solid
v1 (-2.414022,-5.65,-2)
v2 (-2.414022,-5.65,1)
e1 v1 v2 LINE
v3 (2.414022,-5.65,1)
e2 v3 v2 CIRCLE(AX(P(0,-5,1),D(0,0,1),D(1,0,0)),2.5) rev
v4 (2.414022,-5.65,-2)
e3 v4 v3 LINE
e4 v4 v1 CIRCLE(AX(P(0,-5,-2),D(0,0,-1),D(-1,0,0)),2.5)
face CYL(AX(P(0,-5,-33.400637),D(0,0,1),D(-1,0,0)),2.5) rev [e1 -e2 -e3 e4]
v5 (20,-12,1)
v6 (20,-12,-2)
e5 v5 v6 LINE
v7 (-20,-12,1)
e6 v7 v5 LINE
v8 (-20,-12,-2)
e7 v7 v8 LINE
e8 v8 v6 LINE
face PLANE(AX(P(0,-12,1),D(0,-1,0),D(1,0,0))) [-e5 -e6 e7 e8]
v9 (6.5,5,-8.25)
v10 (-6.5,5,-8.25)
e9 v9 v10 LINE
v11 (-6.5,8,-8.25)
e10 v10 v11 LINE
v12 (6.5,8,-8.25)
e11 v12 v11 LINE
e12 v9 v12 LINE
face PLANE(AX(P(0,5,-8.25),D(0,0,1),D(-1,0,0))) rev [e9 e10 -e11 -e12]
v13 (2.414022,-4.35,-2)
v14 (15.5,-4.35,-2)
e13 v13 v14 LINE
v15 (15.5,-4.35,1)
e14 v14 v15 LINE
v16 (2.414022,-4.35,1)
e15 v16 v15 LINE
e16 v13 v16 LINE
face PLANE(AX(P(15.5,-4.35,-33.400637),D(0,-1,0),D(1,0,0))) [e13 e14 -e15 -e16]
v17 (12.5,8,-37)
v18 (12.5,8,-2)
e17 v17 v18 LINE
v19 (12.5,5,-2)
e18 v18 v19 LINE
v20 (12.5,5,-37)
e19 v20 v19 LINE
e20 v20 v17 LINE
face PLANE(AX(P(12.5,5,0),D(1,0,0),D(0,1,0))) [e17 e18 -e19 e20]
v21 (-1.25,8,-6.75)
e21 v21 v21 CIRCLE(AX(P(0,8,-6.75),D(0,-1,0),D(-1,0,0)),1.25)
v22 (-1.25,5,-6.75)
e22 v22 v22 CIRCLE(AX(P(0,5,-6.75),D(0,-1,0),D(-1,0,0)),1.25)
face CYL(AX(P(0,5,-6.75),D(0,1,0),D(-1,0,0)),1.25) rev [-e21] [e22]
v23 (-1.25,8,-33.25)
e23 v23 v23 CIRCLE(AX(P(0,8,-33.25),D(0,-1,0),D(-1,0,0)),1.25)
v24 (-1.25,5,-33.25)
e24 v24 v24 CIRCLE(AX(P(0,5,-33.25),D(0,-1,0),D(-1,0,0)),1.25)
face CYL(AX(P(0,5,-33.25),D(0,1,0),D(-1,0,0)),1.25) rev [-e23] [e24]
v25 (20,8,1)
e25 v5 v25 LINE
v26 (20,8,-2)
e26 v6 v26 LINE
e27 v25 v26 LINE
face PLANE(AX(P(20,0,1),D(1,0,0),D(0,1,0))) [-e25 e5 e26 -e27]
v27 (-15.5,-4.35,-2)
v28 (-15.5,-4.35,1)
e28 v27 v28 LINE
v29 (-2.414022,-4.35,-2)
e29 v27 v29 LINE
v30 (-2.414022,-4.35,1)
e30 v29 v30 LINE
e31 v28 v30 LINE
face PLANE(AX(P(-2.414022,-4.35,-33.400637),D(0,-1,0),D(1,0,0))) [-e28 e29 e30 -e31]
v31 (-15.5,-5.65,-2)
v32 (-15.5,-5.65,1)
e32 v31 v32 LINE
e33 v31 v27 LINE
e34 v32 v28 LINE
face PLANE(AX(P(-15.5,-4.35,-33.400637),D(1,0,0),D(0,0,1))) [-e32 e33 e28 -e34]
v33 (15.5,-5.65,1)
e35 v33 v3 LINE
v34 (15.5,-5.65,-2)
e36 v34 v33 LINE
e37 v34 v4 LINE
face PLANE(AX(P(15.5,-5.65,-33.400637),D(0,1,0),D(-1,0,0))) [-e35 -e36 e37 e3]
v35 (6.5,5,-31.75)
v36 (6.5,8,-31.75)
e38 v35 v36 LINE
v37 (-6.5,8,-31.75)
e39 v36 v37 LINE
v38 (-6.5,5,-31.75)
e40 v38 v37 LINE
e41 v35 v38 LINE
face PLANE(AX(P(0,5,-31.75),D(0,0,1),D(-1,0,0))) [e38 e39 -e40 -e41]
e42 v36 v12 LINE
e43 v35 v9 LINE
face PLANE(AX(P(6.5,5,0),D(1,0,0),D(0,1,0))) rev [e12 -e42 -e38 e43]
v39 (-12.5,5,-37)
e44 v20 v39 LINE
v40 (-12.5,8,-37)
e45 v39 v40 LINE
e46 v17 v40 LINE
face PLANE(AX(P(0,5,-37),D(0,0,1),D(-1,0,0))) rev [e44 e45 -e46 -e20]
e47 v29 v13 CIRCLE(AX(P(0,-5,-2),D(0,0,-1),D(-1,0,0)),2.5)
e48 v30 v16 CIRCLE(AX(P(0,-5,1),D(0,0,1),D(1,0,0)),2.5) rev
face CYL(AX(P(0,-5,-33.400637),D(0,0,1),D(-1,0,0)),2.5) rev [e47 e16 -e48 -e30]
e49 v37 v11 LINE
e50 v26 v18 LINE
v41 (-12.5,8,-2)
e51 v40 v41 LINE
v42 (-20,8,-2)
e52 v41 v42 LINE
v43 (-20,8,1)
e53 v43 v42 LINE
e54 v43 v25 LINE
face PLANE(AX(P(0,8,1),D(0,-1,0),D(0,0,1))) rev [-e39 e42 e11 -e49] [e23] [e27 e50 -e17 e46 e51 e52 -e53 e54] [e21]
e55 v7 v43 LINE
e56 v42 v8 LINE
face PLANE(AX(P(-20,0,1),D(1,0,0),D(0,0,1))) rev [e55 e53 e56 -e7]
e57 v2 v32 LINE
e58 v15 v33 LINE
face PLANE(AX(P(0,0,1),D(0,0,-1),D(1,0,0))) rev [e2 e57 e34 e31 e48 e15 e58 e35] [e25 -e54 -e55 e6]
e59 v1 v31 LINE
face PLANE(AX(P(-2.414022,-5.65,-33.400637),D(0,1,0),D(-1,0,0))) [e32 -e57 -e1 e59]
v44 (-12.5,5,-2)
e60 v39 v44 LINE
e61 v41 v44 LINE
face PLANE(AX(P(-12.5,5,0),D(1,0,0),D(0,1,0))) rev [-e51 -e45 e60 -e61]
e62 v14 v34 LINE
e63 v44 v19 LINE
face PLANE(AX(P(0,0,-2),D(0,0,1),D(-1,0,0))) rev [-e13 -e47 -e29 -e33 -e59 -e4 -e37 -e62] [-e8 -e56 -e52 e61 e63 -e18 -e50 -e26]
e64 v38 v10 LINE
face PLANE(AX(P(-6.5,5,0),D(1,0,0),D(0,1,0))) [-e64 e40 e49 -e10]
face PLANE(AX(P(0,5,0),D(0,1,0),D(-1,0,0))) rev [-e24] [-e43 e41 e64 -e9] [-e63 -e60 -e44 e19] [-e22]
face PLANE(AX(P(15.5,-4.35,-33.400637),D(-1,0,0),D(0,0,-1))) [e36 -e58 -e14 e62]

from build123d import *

# Parameters (mm, degrees)
ESBO_O1_W                         = 40
ESBO_O1_H                         = 20
RESSALTO_EXTRUS_O1_DEPTH          = 1
ESBO_O3_W                         = 40
ESBO_O3_H                         = 20
RESSALTO_EXTRUS_O2_DEPTH          = 2
CORTE_EXTRUS_O1_REACH             = 25.409
CORTE_EXTRUS_O1_DIRECTION_2_REACH = 25.409
ESBO_O4_W                         = 25
ESBO_O4_H                         = 35
ESBO_O4_R                         = 1.25
ESBO_O4_W_2                       = 13
ESBO_O4_H_2                       = 23.5
ESBO_O4_H_3                       = 3
RESSALTO_EXTRUS_O3_DEPTH          = 3
BODY_MOVE_COPY1_START             = 1
BODY_MOVE_COPY1_OUTLINE_W         = 40
BODY_MOVE_COPY1_OUTLINE_H         = 20
BODY_MOVE_COPY1_DEPTH             = 36
BODY_MOVE_COPY1_START_2           = -37
BODY_MOVE_COPY1_2_OUTLINE_W       = 6
BODY_MOVE_COPY1_2_OUTLINE_H       = 3
BODY_MOVE_COPY1_2_DEPTH           = 36
BODY_MOVE_COPY1_START_3           = -2
BODY_MOVE_COPY1_3_DEPTH           = 1
BODY_MOVE_COPY1_START_4           = -8.25
BODY_MOVE_COPY1_4_OUTLINE_W       = 13
BODY_MOVE_COPY1_4_OUTLINE_H       = 3
BODY_MOVE_COPY1_4_DEPTH           = 6.25
BODY_MOVE_COPY1_5_OUTLINE_W       = 13
BODY_MOVE_COPY1_5_OUTLINE_H       = 3
BODY_MOVE_COPY1_5_DEPTH           = 5.25
BODY_MOVE_COPY1_START_5           = 5
BODY_MOVE_COPY1_6_OUTLINE_R       = 1.25
BODY_MOVE_COPY1_6_DEPTH           = 3


with BuildPart() as part:
    # Esboço1 → Ressalto-extrusão1 (new body)
    with BuildSketch(Plane.XY):
        with Locations((0, -2)):
            Rectangle(ESBO_O1_W, ESBO_O1_H)
    extrude(amount=-RESSALTO_EXTRUS_O1_DEPTH)

    # Esboço3 → Ressalto-extrusão2 (add)
    with BuildSketch(Plane.XY):
        with Locations((0, -2)):
            Rectangle(ESBO_O3_W, ESBO_O3_H)
    extrude(amount=RESSALTO_EXTRUS_O2_DEPTH)

    # Corte-extrusão1: up to this face of the body (flat: up to its plane)
    corte_extrus_o1_end = Plane(part.part.faces().sort_by_distance((0, -2, 2))[0])
    # Esboço2 → Corte-extrusão1 (cut, up to the picked face)
    with BuildSketch(Plane.XY, mode=Mode.PRIVATE) as corte_extrus_o1_sk1:
        with BuildLine():
            Line((-2.414021541, -4.35), (-15.5, -4.35))
            Line((-15.5, -4.35), (-15.5, -5.65))
            Line((-15.5, -5.65), (-2.414021541, -5.65))
            ThreePointArc((-2.414021541, -5.65), (0, -7.5), (2.414021541, -5.65))
            Line((2.414021541, -5.65), (15.5, -5.65))
            Line((15.5, -5.65), (15.5, -4.35))
            Line((15.5, -4.35), (2.414021541, -4.35))
            ThreePointArc((2.414021541, -4.35), (0, -2.5), (-2.414021541, -4.35))
        make_face()
    corte_extrus_o1_tool1 = split(extrude(corte_extrus_o1_sk1.sketch, amount=CORTE_EXTRUS_O1_REACH, mode=Mode.PRIVATE), bisect_by=corte_extrus_o1_end, keep=Keep.BOTH, mode=Mode.PRIVATE)
    add(corte_extrus_o1_tool1.solids().sort_by(Axis((0, -5, 0), (0, 0, 1)))[0], mode=Mode.SUBTRACT)

    # Corte-extrusão1 direction 2: up to this face of the body (flat: up to its plane)
    corte_extrus_o1_direction_2_end = Plane(part.part.faces().sort_by_distance((0, -2, -1))[0])
    # Esboço2 → Corte-extrusão1 direction 2 (cut, up to the picked face)
    with BuildSketch(Plane.XY, mode=Mode.PRIVATE) as corte_extrus_o1_direction_2_sk1:
        with BuildLine():
            Line((-2.414021541, -4.35), (-15.5, -4.35))
            Line((-15.5, -4.35), (-15.5, -5.65))
            Line((-15.5, -5.65), (-2.414021541, -5.65))
            ThreePointArc((-2.414021541, -5.65), (0, -7.5), (2.414021541, -5.65))
            Line((2.414021541, -5.65), (15.5, -5.65))
            Line((15.5, -5.65), (15.5, -4.35))
            Line((15.5, -4.35), (2.414021541, -4.35))
            ThreePointArc((2.414021541, -4.35), (0, -2.5), (-2.414021541, -4.35))
        make_face()
    corte_extrus_o1_direction_2_tool1 = split(extrude(corte_extrus_o1_direction_2_sk1.sketch, amount=-CORTE_EXTRUS_O1_DIRECTION_2_REACH, mode=Mode.PRIVATE), bisect_by=corte_extrus_o1_direction_2_end, keep=Keep.BOTH, mode=Mode.PRIVATE)
    add(corte_extrus_o1_direction_2_tool1.solids().sort_by(Axis((0, -5, 0), (0, 0, -1)))[0], mode=Mode.SUBTRACT)

    # Esboço4 → Ressalto-extrusão3 (add)
    # profile 1 of 2: a face of its own
    with BuildSketch(Plane(origin=(0, 8, 0), x_dir=(1, 0, 0), z_dir=(0, 1, 0))):
        with Locations((0, -19.5)):
            Rectangle(ESBO_O4_W, ESBO_O4_H)
        with Locations(Location((0, -33.25, 0), (0, 0, 180))):
            Circle(ESBO_O4_R, mode=Mode.SUBTRACT)
        with Locations((0, -20)):
            Rectangle(ESBO_O4_W_2, ESBO_O4_H_2, mode=Mode.SUBTRACT)
        with Locations(Location((0, -6.75, 0), (0, 0, 180))):
            Circle(ESBO_O4_R, mode=Mode.SUBTRACT)
    # profile 2 of 2: a face of its own
    with BuildSketch(Plane(origin=(0, 8, 0), x_dir=(1, 0, 0), z_dir=(0, 1, 0))):
        with Locations((0, -0.5)):
            Rectangle(ESBO_O4_W, ESBO_O4_H_3)
    extrude(amount=-RESSALTO_EXTRUS_O3_DEPTH)

    # Body-Move/Copy1: read off the stored shape, not the designer's step
    # Body-Move/Copy1 outline → Body-Move/Copy1 (cut)
    with BuildSketch(Plane.XY.offset(BODY_MOVE_COPY1_START)):
        with Locations((0, -2)):
            Rectangle(BODY_MOVE_COPY1_OUTLINE_W, BODY_MOVE_COPY1_OUTLINE_H)
        with BuildLine():
            ThreePointArc((-2.414021541, -4.35), (0, -2.5), (2.414021541, -4.35))
            Line((2.414021541, -4.35), (15.5, -4.35))
            Line((15.5, -4.35), (15.5, -5.65))
            Line((15.5, -5.65), (2.414021541, -5.65))
            ThreePointArc((2.414021541, -5.65), (0, -7.5), (-2.414021541, -5.65))
            Line((-2.414021541, -5.65), (-15.5, -5.65))
            Line((-15.5, -5.65), (-15.5, -4.35))
            Line((-15.5, -4.35), (-2.414021541, -4.35))
        make_face(mode=Mode.SUBTRACT)
    extrude(amount=BODY_MOVE_COPY1_DEPTH, mode=Mode.SUBTRACT)

    # Body-Move_Copy1 2 outline → Body-Move_Copy1 2 (add)
    with BuildSketch(Plane.XY.offset(BODY_MOVE_COPY1_START_2)):
        with Locations((-9.5, 6.5)):
            Rectangle(BODY_MOVE_COPY1_2_OUTLINE_W, BODY_MOVE_COPY1_2_OUTLINE_H)
        with Locations((9.5, 6.5)):
            Rectangle(BODY_MOVE_COPY1_2_OUTLINE_W, BODY_MOVE_COPY1_2_OUTLINE_H)
    extrude(amount=BODY_MOVE_COPY1_2_DEPTH)

    # Body-Move_Copy1 3 outline → Body-Move_Copy1 3 (add)
    with BuildSketch(Plane.XY.offset(BODY_MOVE_COPY1_START_3)):
        Polygon((-20, 8), (-20, -12), (20, -12), (20, 8), (12.5, 8), (12.5, 5), (6.5, 5), (6.5, 8), (-6.5, 8), (-6.5, 5), (-12.5, 5), (-12.5, 8), align=None)
        with BuildLine():
            ThreePointArc((-2.414021541, -4.35), (0, -2.5), (2.414021541, -4.35))
            Line((2.414021541, -4.35), (15.5, -4.35))
            Line((15.5, -4.35), (15.5, -5.65))
            Line((15.5, -5.65), (2.414021541, -5.65))
            ThreePointArc((2.414021541, -5.65), (0, -7.5), (-2.414021541, -5.65))
            Line((-2.414021541, -5.65), (-15.5, -5.65))
            Line((-15.5, -5.65), (-15.5, -4.35))
            Line((-15.5, -4.35), (-2.414021541, -4.35))
        make_face(mode=Mode.SUBTRACT)
    extrude(amount=BODY_MOVE_COPY1_3_DEPTH)

    # Body-Move_Copy1 4 outline → Body-Move_Copy1 4 (add)
    with BuildSketch(Plane.XY.offset(BODY_MOVE_COPY1_START_4)):
        with Locations((0, 6.5)):
            Rectangle(BODY_MOVE_COPY1_4_OUTLINE_W, BODY_MOVE_COPY1_4_OUTLINE_H)
    extrude(amount=BODY_MOVE_COPY1_4_DEPTH)

    # Body-Move_Copy1 5 outline → Body-Move_Copy1 5 (add)
    with BuildSketch(Plane.XY.offset(BODY_MOVE_COPY1_START_2)):
        with Locations((0, 6.5)):
            Rectangle(BODY_MOVE_COPY1_5_OUTLINE_W, BODY_MOVE_COPY1_5_OUTLINE_H)
    extrude(amount=BODY_MOVE_COPY1_5_DEPTH)

    # Body-Move_Copy1 6 outline → Body-Move_Copy1 6 (cut)
    with BuildSketch(Plane(origin=(0, 0, 0), x_dir=(1, 0, 0), z_dir=(0, 1, 0)).offset(BODY_MOVE_COPY1_START_5)):
        with Locations((0, 6.75)):
            Circle(BODY_MOVE_COPY1_6_OUTLINE_R)
        with Locations((0, 33.25)):
            Circle(BODY_MOVE_COPY1_6_OUTLINE_R)
    extrude(amount=BODY_MOVE_COPY1_6_DEPTH, mode=Mode.SUBTRACT)


solid = part.part
